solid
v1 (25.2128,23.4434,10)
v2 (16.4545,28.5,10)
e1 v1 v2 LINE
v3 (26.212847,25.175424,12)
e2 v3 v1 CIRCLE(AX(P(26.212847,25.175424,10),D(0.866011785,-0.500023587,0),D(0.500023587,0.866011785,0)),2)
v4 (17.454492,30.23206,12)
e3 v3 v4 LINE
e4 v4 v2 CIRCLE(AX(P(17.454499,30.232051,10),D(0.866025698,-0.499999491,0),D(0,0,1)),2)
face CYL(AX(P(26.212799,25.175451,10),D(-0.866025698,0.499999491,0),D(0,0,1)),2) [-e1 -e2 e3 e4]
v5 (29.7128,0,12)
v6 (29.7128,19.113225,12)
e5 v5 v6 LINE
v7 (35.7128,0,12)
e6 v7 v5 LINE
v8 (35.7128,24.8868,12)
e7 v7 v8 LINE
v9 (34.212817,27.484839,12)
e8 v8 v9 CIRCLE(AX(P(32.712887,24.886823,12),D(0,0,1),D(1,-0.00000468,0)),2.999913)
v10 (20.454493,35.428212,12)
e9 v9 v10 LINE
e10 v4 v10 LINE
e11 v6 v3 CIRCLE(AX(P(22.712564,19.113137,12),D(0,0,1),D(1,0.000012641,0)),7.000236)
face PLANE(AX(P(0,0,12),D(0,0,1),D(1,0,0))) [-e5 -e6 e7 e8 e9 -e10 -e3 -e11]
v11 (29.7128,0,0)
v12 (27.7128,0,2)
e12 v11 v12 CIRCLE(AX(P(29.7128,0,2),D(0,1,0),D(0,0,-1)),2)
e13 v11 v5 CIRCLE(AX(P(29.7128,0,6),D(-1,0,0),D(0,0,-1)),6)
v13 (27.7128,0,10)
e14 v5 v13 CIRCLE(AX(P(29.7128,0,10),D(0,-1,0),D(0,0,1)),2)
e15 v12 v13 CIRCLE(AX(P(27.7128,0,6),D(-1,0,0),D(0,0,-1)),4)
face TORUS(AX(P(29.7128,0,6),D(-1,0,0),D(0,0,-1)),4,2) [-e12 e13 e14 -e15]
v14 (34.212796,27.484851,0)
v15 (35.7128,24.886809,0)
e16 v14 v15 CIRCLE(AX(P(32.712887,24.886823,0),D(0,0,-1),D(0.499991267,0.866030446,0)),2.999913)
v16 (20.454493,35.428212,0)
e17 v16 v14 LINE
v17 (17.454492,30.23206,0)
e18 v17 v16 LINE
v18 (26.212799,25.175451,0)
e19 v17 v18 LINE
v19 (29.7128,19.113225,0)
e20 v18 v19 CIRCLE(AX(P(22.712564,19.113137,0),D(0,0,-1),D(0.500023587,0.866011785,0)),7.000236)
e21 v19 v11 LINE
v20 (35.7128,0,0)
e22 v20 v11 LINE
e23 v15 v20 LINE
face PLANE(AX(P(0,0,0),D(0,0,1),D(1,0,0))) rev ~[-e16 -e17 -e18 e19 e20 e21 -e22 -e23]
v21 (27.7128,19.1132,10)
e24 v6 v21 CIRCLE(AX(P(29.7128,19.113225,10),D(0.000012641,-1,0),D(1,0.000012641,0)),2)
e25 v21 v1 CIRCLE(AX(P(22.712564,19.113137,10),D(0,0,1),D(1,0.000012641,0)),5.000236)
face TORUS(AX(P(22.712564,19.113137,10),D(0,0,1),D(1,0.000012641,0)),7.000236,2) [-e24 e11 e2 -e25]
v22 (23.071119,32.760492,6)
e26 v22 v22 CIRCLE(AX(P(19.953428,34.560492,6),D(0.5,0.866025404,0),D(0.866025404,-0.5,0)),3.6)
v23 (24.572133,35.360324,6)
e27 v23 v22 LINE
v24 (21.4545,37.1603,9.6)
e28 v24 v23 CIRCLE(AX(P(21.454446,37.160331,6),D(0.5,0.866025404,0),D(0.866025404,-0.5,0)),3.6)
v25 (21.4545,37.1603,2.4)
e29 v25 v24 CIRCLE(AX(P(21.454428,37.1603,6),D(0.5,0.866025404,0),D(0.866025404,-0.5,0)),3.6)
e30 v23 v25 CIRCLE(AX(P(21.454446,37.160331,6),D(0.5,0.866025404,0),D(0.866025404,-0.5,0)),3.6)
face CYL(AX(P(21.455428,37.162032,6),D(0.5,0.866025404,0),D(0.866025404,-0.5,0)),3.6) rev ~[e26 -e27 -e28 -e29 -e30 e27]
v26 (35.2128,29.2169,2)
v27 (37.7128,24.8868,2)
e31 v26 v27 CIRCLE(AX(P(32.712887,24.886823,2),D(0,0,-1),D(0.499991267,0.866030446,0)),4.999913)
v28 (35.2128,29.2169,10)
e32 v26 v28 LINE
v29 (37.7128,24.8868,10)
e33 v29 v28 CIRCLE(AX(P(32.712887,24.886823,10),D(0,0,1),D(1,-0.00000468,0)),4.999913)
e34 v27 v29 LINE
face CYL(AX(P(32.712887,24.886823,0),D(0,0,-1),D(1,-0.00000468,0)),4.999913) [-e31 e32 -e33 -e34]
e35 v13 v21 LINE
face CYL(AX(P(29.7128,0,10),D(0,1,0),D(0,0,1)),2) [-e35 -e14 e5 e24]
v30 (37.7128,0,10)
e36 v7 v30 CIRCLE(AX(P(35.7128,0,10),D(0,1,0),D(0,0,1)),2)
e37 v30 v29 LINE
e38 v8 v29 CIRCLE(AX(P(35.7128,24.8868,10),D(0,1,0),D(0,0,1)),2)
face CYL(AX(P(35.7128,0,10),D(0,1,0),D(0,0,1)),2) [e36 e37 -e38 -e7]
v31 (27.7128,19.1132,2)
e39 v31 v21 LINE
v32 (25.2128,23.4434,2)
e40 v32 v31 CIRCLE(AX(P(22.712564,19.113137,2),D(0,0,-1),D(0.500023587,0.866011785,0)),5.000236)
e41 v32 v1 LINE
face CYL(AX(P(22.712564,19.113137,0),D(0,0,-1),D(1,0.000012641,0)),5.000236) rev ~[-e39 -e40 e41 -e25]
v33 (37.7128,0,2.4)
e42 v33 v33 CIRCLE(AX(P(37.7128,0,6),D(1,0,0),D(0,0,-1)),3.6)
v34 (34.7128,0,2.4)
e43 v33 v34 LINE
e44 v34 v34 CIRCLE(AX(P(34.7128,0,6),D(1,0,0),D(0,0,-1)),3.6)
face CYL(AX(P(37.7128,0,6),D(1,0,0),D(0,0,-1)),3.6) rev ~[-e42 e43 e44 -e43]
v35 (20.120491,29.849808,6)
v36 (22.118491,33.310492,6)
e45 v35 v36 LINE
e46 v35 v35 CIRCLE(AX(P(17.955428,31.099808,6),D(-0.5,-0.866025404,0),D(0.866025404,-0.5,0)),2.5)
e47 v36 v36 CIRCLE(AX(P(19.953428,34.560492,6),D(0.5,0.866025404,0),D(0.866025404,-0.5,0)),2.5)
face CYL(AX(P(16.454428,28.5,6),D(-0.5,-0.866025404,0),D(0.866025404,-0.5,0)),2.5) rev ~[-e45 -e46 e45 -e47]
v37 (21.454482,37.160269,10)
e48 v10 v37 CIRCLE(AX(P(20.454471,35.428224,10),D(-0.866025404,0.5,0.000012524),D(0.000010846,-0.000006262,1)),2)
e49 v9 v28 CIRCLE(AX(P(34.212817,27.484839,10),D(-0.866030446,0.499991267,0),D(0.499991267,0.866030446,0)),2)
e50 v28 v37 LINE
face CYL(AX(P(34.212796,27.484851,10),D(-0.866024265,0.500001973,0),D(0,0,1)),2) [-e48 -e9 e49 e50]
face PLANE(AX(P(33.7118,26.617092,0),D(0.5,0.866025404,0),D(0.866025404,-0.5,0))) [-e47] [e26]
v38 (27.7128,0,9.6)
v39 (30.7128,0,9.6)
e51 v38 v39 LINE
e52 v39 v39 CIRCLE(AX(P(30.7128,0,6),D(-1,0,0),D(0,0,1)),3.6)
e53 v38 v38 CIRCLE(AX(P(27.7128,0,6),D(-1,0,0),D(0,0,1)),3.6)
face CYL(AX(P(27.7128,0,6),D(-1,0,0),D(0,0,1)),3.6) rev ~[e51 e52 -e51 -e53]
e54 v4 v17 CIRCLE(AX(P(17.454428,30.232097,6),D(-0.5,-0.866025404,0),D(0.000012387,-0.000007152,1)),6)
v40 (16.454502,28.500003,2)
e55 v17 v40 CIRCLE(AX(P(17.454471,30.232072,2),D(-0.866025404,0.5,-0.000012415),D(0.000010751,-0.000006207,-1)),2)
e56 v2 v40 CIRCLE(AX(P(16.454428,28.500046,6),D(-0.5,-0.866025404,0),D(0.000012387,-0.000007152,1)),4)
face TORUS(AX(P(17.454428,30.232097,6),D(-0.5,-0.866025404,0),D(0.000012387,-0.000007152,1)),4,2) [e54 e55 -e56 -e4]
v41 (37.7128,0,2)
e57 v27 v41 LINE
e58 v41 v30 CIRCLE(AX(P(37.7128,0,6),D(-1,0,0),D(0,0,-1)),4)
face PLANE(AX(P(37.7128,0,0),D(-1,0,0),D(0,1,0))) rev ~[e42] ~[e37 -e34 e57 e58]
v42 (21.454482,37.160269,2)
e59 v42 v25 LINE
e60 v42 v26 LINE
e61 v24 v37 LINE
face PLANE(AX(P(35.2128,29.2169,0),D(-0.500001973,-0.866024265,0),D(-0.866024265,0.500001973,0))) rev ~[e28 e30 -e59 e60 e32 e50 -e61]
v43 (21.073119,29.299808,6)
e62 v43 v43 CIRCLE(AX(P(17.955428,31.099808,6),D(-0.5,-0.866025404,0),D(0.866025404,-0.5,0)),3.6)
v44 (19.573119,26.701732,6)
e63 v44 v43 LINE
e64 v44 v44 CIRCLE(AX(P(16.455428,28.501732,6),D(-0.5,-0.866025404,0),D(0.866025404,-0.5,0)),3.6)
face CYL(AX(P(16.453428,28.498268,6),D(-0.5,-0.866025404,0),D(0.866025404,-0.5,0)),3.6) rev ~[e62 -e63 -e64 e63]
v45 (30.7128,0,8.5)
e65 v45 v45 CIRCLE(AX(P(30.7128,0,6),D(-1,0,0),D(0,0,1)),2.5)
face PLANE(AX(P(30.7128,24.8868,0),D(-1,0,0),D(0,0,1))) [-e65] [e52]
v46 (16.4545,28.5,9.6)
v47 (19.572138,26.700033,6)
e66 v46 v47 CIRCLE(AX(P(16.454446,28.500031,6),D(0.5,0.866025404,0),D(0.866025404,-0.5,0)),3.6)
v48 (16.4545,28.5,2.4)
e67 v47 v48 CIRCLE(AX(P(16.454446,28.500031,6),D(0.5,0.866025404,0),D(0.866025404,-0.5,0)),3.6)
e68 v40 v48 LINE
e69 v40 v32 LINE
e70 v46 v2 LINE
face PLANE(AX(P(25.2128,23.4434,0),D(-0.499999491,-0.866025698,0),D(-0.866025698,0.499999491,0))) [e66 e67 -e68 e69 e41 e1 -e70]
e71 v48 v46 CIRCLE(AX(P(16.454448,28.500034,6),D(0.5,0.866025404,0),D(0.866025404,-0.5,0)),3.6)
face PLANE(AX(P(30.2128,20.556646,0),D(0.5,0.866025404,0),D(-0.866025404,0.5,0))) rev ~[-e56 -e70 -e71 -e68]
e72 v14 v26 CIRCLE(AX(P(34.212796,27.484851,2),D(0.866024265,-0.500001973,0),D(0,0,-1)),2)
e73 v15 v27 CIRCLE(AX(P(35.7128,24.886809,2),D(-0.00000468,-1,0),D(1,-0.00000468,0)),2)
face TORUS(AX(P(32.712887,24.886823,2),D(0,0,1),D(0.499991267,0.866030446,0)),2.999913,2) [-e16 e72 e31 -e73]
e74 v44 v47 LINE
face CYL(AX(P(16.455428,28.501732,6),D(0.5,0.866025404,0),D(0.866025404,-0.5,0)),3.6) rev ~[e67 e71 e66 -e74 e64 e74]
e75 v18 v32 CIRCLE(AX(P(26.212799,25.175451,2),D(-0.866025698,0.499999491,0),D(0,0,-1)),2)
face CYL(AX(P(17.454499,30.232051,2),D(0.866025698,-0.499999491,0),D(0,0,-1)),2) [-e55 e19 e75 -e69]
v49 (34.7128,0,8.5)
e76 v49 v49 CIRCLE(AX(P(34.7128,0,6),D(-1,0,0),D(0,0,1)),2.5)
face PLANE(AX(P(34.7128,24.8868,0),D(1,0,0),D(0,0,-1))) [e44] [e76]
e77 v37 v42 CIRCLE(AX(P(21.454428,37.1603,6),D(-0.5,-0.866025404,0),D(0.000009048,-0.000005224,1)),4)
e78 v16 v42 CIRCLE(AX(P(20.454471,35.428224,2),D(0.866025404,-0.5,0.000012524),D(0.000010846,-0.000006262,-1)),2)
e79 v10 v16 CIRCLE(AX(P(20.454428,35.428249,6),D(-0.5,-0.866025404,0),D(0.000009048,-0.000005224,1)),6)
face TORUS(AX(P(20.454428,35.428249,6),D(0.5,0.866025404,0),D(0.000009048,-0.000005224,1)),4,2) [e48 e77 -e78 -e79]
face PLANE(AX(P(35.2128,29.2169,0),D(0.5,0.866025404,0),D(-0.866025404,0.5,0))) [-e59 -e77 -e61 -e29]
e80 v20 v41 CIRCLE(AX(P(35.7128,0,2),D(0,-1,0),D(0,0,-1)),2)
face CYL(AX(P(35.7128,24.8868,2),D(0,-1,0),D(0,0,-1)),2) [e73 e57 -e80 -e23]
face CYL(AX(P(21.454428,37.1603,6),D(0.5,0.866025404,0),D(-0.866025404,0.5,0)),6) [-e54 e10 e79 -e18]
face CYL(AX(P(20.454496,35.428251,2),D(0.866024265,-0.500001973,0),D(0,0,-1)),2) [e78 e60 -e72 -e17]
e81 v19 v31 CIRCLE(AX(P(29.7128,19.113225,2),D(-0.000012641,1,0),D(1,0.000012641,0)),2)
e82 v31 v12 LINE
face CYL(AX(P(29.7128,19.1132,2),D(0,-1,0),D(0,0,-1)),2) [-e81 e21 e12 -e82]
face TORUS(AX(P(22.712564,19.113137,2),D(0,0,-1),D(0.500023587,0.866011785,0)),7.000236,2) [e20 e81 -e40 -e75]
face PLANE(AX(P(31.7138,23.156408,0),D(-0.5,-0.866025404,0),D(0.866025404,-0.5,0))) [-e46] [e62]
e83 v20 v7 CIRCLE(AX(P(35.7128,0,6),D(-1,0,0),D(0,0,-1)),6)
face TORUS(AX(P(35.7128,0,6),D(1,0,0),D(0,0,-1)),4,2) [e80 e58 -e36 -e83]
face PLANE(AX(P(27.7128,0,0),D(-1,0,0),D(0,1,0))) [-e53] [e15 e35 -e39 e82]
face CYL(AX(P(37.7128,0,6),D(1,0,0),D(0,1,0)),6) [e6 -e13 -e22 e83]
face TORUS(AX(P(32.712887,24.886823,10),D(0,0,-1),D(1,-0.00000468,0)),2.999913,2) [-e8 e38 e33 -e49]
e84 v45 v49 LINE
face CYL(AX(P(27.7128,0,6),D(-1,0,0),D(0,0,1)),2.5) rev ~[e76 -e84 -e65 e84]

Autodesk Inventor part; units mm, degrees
ref_plane "YZ Plane" through (0, 0, 0) normal (1, 0, 0) x (0, 1, 0)
sketch "Sketch1" plane through (0, 0, 0) normal (0, 0, 1) x (1, 0, 0)
  line L0 (37.7128, 0) -> (0, 0)
  line L1 (0, 0) -> (34.8308, 60.3287)
  line L2 (27.7128, 0) -> (27.7128, 19.1132)
  line L3 (25.2128, 23.4434) -> (16.4545, 28.5)
  line L4 (37.7128, 0) -> (37.7128, 24.8868)
  line L5 (35.2128, 29.2169) -> (21.4545, 37.1603)
  arc A0 (27.7128, 19.1132) -> (25.2128, 23.4434) centre (22.7128, 19.1132) ccw
  arc A1 (37.7128, 24.8868) -> (35.2128, 29.2169) centre (32.7128, 24.8868) ccw
  line L6 (21.4545, 37.1603) -> (16.4545, 28.5)
  line L7 (21.4545, 37.1603) -> (35.2128, 29.2169)
  line L8 (16.4545, 28.5) -> (25.2128, 23.4434)
  line L9 (27.7128, 0) -> (37.7128, 0)
  line L10 (37.7128, 0) -> (37.7128, 24.8868)
  line L11 (27.7128, 0) -> (37.7128, 0)
  line L12 (37.7128, 0) -> (37.7128, 24.8868)
  line L13 (35.2128, 29.2169) -> (21.4545, 37.1603)
  line L14 (21.4545, 37.1603) -> (16.4545, 28.5)
  line L15 (16.4545, 28.5) -> (25.2128, 23.4434)
  line L16 (27.7128, 19.1132) -> (27.7128, 0)
  point P0 (25, 43.3013)
  point P1 (27.7128, 22)
  dimension "d37" = 60
  dimension "d38" = 10
  dimension "d39" = 10
  dimension "d40" = 0
  dimension "d41" = 0
  dimension "d42" = 22
  dimension "d43" = 13
  dimension "d44" = 120
  dimension "d45" = 5
extrude "Extrusion1" add sketch "Sketch1" along normal blind 12 contours L0 L2 A0 L3 L1 L5 A1 L4
ref_plane "Work Plane1" through (35.2128, 29.2169, 0) normal (0.5, 0.8660254, 0) x (-0.8660254, 0.5, 0)
sketch "Sketch2" plane through (35.2128, 29.2169, 0) normal (0.5, 0.8660254, 0) x (-0.8660254, 0.5, 0)
  circle A0 centre (15.8868, 6) radius 6
  line L0 (15.8868, 0) -> (15.8868, 12) projected
  line L1 (0, 12) -> (15.8868, 12) projected
  dimension "d5" = 12
  dimension "d47" = 0
  dimension "d48" = 6
extrude "Extrusion2" add sketch "Sketch2" against normal blind 10
ref_plane "Work Plane2" through (37.7128, 24.8868, 0) normal (1, 0, 0) x (0, 1, 0)
sketch "Sketch3" plane through (37.7128, 24.8868, 0) normal (1, 0, 0) x (0, 1, 0)
  circle A0 centre (-24.8868, 6) radius 6
  line L0 (-24.8868, 0) -> (-24.8868, 12) projected
  line L1 (-24.8868, 0) -> (0, 0) projected
  point P0 (43.3013, 10)
  point P1 (3.6132, 12)
  dimension "d10" = 12
  dimension "d49" = 0
  dimension "d50" = 6
extrude "Extrusion3" add sketch "Sketch3" against normal blind 10
sketch "Sketch4" plane through (30.2128, 20.5566, 0) normal (-0.5, -0.8660254, 0) x (0.8660254, -0.5, 0)
  circle A0 centre (-15.8868, 6) radius 2.5
  circle A1 centre (-15.8868, 6) radius 6 projected
  point P0 (-15.8868, 0)
  point P1 (-15.8868, 12)
  dimension "d15" = 5
extrude "Extrusion4" cut sketch "Sketch4" along normal through all both and the other way through all contours A0
sketch "Sketch5" plane through (27.7128, 24.8868, 0) normal (-1, 0, 0) x (0, 0, 1)
  circle A0 centre (6, -24.8868) radius 2.5
  arc A1 (0, -24.8868) -> (12, -24.8868) centre (6, -24.8868) ccw projected
  dimension "d18" = 5
extrude "Extrusion5" cut sketch "Sketch5" along normal through all both and the other way through all
sketch "Sketch6" plane through (35.2128, 29.2169, 0) normal (0.5, 0.8660254, 0) x (0.8660254, -0.5, 0)
  circle A0 centre (-15.8868, -6) radius 3.6
  circle A1 centre (-15.8868, -6) radius 2.5
  arc A2 (-15.8868, 0) -> (-15.8868, 0) centre (-15.8868, -6) ccw projected
  point P0 (0, -10)
  dimension "d21" = 5
  dimension "d22" = 7.2
extrude "Extrusion6" cut sketch "Sketch6" against normal blind 3 contours A0
sketch "Sketch7" plane through (30.2128, 20.5566, 0) normal (-0.5, -0.8660254, 0) x (0.8660254, -0.5, 0)
  circle A0 centre (-15.8868, 6) radius 3.6
  circle A1 centre (-15.8868, 6) radius 2.5
  arc A2 (-13.3868, 6) -> (-13.3868, 6) centre (-15.8868, 6) ccw projected
  point P0 (-15.8868, 0)
  dimension "d25" = 5
  dimension "d26" = 7.2
extrude "Extrusion7" cut sketch "Sketch7" along normal mid plane 6
sketch "Sketch8" plane through (27.7128, 24.8868, 0) normal (-1, 0, 0) x (0, 0, 1)
  circle A0 centre (6, -24.8868) radius 3.6
  circle A1 centre (6, -24.8868) radius 2.5
  arc A2 (8.5, -24.8868) -> (8.5, -24.8868) centre (6, -24.8868) ccw projected
  point P0 (0, -24.8868)
  dimension "d29" = 7.2
  dimension "d30" = 5
extrude "Extrusion8" cut sketch "Sketch8" along normal mid plane 6
sketch "Sketch9" plane through (37.7128, 24.8868, 0) normal (1, 0, 0) x (0, 0, -1)
  circle A0 centre (-6, -24.8868) radius 3.6
  circle A1 centre (-6, -24.8868) radius 2.5
  circle A2 centre (-6, -24.8868) radius 2.5 projected
  point P0 (0, -24.8868)
  dimension "d33" = 5
  dimension "d34" = 7.2
extrude "Extrusion9" cut sketch "Sketch9" against normal blind 3
fillet "Fillet1" radius 2 16 edges at (16.2583, 40.1603, 6) (28.3336, 33.1886, 0) (37.0429, 27.3868, 0) (37.7128, 12.4434, 0) (37.7128, -6, 6) (37.7128, 12.4434, 12) (37.0429, 27.3868, 12) (28.3336, 33.1886, 12) (27.0429, 21.6132, 12) (27.7128, 9.5566, 12) (27.7128, -6, 6) (27.7128, 9.5566, 0) (27.0429, 21.6132, 0) (20.8336, 25.9717, 0) (11.2583, 31.5, 6) (20.8336, 25.9717, 12)
equation "\"d38\" = d46"
equation "\"d39\" = d46"
equation "\"d3\" = width"
equation "\"d5\" = width"
equation "\"d48\" = 0.5 * width"
equation "\"d8\" = thickness"
equation "\"d10\" = width"
equation "\"d50\" = 0.5 * width"
equation "\"d13\" = thickness"
equation "\"thickness\" = thickness_1"
equation "\"width\" = width_1"
equation "\"d46\" = 10"
equation "\"thickness_1\" = 10"
equation "\"width_1\" = 12"
properties part number "Link2"
